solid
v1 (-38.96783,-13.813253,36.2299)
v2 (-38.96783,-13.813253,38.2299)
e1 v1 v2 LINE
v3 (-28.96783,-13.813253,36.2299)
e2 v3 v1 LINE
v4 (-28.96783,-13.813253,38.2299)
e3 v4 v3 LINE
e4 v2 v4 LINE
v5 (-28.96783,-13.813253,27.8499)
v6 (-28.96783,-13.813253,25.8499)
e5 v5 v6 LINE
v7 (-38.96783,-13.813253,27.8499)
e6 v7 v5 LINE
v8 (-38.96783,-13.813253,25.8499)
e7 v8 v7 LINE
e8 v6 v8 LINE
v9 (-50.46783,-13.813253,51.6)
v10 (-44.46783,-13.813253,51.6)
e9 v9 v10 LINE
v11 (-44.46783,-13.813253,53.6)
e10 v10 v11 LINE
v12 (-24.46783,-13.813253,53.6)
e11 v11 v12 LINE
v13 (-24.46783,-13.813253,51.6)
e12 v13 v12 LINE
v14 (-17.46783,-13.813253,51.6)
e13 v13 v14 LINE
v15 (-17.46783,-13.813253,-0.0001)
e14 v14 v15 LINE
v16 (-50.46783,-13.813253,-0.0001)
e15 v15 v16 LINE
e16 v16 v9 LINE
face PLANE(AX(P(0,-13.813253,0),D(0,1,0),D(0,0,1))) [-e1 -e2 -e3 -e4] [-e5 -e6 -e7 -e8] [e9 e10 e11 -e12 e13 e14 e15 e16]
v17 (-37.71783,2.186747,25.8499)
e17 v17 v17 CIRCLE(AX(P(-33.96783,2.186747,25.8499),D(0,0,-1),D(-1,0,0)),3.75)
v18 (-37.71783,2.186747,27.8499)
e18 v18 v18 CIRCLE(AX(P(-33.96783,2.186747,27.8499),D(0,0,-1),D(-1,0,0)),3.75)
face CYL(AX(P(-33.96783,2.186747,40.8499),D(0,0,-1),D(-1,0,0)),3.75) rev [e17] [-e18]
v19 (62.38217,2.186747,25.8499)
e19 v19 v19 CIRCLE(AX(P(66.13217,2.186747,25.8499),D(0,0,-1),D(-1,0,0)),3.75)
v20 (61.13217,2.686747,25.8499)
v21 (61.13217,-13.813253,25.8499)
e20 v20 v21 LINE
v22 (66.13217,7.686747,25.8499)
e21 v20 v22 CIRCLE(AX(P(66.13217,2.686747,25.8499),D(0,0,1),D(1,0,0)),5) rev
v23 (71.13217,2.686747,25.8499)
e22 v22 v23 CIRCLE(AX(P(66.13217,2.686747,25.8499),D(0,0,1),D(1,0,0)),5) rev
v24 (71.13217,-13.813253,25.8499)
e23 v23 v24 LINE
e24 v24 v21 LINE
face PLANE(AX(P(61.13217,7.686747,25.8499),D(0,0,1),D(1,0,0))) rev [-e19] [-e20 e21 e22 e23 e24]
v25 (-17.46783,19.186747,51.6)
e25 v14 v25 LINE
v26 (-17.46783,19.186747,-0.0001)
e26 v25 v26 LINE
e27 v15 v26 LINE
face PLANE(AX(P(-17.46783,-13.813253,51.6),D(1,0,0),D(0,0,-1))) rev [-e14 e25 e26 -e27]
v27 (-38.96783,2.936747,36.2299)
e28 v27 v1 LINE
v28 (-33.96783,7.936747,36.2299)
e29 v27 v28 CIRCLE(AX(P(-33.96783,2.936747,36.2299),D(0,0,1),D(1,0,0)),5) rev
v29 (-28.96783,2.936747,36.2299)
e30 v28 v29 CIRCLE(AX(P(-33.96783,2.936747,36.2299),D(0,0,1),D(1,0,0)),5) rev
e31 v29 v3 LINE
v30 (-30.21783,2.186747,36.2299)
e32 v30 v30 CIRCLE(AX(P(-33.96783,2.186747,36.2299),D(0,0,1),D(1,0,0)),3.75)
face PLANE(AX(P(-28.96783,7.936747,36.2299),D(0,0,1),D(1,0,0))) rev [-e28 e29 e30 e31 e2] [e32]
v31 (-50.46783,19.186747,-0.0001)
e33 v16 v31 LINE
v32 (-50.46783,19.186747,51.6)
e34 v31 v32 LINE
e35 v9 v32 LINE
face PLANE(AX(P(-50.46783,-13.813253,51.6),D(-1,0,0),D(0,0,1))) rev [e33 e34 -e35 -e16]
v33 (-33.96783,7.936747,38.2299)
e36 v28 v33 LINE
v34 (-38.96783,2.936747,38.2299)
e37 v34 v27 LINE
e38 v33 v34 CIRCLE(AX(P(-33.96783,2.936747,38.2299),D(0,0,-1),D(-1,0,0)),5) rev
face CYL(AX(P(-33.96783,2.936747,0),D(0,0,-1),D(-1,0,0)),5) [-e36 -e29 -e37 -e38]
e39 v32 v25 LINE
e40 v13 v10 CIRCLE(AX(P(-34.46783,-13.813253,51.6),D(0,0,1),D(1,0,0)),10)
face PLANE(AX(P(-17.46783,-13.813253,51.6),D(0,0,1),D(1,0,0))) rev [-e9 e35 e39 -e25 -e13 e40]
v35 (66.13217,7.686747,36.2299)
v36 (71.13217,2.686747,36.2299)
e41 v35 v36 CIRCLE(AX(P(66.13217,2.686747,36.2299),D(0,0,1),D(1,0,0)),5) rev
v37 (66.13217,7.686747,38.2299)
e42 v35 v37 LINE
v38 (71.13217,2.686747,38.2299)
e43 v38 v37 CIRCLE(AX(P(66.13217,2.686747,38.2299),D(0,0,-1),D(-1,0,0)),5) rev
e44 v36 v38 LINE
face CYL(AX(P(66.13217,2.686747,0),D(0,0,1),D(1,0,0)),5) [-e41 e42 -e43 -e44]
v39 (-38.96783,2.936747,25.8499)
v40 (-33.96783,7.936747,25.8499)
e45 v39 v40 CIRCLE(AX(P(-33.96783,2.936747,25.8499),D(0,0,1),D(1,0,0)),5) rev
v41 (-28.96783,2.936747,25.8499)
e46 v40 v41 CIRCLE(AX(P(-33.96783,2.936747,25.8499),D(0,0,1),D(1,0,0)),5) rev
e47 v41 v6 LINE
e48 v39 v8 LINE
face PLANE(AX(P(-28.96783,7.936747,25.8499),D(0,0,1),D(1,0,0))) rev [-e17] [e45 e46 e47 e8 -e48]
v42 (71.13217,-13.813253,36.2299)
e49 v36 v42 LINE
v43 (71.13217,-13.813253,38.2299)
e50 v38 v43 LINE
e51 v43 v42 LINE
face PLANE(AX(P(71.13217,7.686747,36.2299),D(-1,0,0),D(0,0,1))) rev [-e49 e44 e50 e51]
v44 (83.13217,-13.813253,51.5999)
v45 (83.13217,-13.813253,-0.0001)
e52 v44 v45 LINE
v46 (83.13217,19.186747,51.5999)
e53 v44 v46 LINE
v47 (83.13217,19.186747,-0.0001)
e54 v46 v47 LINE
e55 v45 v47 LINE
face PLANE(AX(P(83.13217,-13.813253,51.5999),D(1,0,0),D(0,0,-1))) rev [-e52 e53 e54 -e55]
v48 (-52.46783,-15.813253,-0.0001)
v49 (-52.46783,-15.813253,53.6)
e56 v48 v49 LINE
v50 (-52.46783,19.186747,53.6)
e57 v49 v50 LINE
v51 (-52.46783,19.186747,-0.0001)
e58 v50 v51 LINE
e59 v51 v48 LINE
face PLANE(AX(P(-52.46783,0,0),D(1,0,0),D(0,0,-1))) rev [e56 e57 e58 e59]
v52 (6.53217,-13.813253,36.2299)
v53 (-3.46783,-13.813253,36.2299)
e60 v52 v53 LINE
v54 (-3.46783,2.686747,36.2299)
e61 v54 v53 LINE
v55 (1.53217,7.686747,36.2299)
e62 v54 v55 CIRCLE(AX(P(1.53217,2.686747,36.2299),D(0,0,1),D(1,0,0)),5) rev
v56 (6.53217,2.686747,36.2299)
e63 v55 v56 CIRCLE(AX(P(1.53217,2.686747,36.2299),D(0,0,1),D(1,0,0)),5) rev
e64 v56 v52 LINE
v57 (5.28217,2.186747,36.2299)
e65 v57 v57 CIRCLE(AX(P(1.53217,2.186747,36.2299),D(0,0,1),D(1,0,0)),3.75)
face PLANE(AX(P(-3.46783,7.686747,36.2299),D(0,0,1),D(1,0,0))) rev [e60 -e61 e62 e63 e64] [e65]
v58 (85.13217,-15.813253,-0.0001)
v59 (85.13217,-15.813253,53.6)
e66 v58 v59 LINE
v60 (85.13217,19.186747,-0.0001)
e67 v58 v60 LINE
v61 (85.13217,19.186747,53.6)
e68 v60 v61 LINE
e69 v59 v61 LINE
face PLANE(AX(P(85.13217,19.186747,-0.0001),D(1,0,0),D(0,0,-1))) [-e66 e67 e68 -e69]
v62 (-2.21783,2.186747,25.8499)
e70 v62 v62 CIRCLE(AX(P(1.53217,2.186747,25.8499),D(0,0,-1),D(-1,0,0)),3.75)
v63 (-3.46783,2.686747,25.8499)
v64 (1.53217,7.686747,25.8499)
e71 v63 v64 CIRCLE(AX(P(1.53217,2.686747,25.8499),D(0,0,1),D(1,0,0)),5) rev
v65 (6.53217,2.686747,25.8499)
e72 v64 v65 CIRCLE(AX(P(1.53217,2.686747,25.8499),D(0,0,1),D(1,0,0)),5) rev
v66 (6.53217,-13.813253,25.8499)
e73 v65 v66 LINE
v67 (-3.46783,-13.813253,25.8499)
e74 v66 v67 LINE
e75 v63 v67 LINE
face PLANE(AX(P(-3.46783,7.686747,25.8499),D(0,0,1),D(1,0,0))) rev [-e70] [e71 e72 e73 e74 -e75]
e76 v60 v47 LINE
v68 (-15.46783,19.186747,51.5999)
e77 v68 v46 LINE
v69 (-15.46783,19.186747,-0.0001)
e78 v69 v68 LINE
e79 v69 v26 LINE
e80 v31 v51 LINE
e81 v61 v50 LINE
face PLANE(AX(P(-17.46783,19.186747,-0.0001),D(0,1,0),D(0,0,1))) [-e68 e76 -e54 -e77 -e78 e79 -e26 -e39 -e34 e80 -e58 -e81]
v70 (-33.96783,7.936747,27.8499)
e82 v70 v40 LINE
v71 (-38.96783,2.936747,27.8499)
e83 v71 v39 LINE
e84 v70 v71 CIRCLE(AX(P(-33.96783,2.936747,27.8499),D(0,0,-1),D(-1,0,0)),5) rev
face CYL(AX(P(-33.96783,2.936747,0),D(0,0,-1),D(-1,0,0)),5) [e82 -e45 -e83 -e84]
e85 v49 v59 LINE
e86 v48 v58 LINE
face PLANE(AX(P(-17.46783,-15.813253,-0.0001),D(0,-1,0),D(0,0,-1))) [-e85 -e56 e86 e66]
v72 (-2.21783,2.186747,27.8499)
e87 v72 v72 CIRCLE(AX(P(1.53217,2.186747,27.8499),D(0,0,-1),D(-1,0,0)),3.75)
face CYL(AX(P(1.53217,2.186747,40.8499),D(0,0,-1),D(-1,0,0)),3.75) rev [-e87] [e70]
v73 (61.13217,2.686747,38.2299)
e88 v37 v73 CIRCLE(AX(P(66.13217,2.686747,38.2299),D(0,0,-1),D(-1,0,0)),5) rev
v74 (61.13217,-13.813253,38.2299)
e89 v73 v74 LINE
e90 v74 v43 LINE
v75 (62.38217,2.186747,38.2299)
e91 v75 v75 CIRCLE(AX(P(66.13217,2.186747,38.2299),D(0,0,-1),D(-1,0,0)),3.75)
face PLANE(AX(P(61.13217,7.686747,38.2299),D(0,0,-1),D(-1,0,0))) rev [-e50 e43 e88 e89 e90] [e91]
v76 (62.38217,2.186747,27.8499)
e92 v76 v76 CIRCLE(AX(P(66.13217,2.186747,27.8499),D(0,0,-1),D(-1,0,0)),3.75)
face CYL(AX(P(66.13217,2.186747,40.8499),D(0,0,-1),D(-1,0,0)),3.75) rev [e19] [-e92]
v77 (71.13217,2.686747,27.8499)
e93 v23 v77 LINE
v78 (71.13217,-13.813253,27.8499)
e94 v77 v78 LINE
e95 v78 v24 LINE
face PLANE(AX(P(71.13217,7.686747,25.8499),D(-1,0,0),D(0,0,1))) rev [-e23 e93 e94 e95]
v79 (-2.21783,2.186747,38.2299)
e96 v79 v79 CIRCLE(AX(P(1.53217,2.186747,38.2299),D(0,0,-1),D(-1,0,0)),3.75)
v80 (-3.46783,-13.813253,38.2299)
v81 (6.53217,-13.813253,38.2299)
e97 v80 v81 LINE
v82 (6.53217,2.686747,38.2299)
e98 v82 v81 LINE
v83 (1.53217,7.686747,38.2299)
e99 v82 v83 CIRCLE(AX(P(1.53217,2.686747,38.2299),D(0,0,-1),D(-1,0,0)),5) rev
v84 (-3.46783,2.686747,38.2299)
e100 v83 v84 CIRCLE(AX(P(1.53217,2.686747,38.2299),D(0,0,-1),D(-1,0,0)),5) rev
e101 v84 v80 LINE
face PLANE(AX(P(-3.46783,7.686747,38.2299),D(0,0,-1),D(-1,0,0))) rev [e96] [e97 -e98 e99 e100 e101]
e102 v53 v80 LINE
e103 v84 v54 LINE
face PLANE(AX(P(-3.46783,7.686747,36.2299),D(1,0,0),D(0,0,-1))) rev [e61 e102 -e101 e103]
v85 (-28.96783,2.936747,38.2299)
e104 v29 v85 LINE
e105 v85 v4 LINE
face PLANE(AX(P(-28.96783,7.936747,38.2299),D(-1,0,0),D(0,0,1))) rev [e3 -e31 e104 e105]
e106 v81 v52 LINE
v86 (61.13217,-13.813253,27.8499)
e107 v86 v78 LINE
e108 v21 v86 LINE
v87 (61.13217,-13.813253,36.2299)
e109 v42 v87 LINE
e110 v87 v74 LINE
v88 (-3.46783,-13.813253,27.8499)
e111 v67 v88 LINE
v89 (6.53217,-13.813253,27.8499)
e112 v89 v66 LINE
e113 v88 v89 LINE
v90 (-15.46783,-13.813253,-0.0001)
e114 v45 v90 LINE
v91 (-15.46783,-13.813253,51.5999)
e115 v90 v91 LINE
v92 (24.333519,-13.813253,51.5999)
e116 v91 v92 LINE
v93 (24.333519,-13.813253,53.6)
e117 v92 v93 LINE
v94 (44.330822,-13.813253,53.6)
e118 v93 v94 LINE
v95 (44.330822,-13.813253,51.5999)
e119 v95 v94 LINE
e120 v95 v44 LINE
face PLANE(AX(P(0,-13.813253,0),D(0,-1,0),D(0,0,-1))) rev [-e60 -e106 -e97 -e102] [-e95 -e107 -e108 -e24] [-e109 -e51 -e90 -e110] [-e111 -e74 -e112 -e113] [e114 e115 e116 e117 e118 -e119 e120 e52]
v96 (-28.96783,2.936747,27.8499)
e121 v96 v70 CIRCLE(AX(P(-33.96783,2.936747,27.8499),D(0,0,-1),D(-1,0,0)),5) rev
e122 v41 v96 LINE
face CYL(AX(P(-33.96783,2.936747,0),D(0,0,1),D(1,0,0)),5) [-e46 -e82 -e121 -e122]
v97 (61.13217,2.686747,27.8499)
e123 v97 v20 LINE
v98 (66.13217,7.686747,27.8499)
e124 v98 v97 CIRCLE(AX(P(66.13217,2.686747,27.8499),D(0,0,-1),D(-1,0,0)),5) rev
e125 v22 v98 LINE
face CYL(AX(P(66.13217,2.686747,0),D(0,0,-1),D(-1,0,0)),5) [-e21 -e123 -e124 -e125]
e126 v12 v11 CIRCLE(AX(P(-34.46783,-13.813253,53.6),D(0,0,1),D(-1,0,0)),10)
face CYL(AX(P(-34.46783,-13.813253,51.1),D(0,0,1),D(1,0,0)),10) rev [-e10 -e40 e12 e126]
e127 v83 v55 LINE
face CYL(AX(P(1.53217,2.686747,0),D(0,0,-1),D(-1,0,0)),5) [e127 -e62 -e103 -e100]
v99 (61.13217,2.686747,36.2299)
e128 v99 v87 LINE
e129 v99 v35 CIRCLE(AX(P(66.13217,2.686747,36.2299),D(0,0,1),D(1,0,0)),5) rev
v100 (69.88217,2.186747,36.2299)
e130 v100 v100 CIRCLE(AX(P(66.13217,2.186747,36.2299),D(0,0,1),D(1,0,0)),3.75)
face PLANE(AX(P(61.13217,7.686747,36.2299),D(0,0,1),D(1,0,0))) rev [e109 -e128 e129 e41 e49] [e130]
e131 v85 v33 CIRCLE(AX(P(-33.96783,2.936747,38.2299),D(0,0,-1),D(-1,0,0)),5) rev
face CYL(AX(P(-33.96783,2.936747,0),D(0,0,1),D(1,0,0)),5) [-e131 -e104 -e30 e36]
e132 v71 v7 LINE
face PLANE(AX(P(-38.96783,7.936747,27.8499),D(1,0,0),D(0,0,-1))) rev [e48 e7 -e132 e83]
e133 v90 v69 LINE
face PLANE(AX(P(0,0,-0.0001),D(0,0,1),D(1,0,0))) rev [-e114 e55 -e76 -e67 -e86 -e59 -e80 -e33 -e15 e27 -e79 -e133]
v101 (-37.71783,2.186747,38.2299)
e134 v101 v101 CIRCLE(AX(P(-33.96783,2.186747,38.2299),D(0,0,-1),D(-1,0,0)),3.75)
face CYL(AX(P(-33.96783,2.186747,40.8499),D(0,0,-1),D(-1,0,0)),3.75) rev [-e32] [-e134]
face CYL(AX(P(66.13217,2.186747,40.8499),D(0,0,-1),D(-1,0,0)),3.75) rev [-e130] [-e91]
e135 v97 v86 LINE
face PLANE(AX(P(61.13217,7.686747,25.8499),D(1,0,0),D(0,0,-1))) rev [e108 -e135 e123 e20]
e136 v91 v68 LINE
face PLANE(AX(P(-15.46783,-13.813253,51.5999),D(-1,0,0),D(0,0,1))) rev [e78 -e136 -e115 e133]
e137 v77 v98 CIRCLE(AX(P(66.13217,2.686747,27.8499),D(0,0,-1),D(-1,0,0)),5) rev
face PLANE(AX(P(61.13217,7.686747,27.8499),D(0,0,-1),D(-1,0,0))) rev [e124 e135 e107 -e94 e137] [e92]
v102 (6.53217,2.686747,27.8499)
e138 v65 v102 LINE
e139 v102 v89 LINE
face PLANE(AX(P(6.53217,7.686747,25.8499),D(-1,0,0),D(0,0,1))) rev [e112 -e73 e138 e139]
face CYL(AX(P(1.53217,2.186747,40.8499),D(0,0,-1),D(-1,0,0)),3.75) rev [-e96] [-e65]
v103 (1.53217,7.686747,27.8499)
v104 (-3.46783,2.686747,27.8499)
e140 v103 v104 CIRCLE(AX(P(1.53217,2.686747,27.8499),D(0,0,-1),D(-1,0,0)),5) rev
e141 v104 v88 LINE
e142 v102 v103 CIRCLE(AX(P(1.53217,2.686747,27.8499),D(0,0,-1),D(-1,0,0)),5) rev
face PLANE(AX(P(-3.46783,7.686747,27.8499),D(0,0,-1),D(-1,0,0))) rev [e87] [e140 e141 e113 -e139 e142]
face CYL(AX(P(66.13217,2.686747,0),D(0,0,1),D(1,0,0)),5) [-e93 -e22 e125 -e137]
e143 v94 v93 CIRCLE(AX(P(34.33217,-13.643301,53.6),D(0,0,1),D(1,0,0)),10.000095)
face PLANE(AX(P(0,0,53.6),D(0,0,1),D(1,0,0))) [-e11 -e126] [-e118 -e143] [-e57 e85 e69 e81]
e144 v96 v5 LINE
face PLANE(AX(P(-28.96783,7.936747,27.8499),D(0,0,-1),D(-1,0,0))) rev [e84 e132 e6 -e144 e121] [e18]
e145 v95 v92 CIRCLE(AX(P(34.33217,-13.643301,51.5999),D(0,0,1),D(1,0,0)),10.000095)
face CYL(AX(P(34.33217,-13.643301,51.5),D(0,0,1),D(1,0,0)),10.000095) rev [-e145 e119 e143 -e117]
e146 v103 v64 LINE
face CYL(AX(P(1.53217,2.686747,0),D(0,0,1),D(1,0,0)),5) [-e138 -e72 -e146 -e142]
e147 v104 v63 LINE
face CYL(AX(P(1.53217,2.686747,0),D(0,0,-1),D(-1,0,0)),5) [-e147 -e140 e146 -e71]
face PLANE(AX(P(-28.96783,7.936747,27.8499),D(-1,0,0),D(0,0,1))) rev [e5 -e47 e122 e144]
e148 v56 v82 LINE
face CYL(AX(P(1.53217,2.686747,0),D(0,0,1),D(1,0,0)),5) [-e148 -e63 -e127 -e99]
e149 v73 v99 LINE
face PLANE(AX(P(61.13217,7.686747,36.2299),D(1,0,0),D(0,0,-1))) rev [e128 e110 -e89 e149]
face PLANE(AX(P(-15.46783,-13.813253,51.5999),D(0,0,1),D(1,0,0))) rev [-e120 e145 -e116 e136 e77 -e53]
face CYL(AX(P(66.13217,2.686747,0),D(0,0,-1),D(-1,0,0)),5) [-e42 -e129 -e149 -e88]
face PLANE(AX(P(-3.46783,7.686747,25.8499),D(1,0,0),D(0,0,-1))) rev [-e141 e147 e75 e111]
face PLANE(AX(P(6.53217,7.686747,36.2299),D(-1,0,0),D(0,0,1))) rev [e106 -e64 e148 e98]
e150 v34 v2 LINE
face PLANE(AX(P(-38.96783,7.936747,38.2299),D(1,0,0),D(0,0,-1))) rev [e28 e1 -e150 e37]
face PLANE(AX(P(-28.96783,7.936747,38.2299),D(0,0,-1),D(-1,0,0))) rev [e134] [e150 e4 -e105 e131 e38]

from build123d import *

# Parameters (mm, degrees)
BOSS_EXTRU_1_DEPTH      = 53.6
BOSS_EXTRU_1_DEPTH_BACK = 0.0001
ESQUISSE1_W             = 102.6
ESQUISSE1_H             = 35
ESQUISSE4_W             = 98.6
ESQUISSE4_H             = 51.6
ENL_V_MAT_EXTRU_2_DEPTH = 33
ESQUISSE9_W             = 10
ESQUISSE9_H             = 2
BOSS_EXTRU_3_DEPTH      = 21.5
CONG_2_R                = 5
ESQUISSE10_R            = 3.75
ENL_V_MAT_EXTRU_4_DEPTH = 15
ESQUISSE16_W            = 53.6001
ESQUISSE16_H            = 35
BOSS_EXTRU_5_DEPTH      = 35
ENL_V_MAT_EXTRU_5_DEPTH = 2.1
ESQUISSE19_W            = 33
ESQUISSE19_H            = 51.6001
ENL_V_MAT_EXTRU_6_DEPTH = 33
ENL_V_MAT_EXTRU_7_DEPTH = 2.5
ESQUISSE21_W            = 10
ESQUISSE21_H            = 2
BOSS_EXTRU_6_DEPTH      = 21.75
CONG_3_R                = 5
ESQUISSE22_R            = 3.75
ENL_V_MAT_EXTRU_8_DEPTH = 15


with BuildPart() as part:
    # Esquisse1 → Boss.-Extru.1 (new, two sides: drawn at the far end of the back side and taken through both)
    with BuildSketch(Plane.XY.offset(-BOSS_EXTRU_1_DEPTH_BACK)):
        with Locations((33.832170394, 1.686746988)):
            Rectangle(ESQUISSE1_W, ESQUISSE1_H)
    extrude(amount=BOSS_EXTRU_1_DEPTH + BOSS_EXTRU_1_DEPTH_BACK)

    # Esquisse4 → Enlèv. mat.-Extru.2 (cut)
    with BuildSketch(Plane(origin=(0, 19.186746988, 0), x_dir=(1, 0, 0), z_dir=(0, 1, 0))):
        with Locations((33.832170394, -25.7999)):
            Rectangle(ESQUISSE4_W, ESQUISSE4_H)
    extrude(amount=-ENL_V_MAT_EXTRU_2_DEPTH, mode=Mode.SUBTRACT)

    # Esquisse9 → Boss.-Extru.3 (add)
    with BuildSketch(Plane(origin=(0, -13.813253012, 0), x_dir=(1, 0, 0), z_dir=(0, 1, 0))):
        with Locations((1.532170394, -26.8499)):
            Rectangle(ESQUISSE9_W, ESQUISSE9_H)
        with Locations((1.532170394, -37.2299)):
            Rectangle(ESQUISSE9_W, ESQUISSE9_H)
        with Locations((66.132170394, -26.8499)):
            Rectangle(ESQUISSE9_W, ESQUISSE9_H)
        with Locations((66.132170394, -37.2299)):
            Rectangle(ESQUISSE9_W, ESQUISSE9_H)
    extrude(amount=BOSS_EXTRU_3_DEPTH)

    # Congé2
    cong_2_edges = [part.edges().sort_by_distance(p)[0] for p in [
        (71.132170394, 7.686746988, 37.2299),
        (61.132170394, 7.686746988, 37.2299),
        (71.132170394, 7.686746988, 26.8499),
        (61.132170394, 7.686746988, 26.8499),
        (-3.467829606, 7.686746988, 37.2299),
        (6.532170394, 7.686746988, 37.2299),
        (-3.467829606, 7.686746988, 26.8499),
        (6.532170394, 7.686746988, 26.8499),
    ]]
    fillet(cong_2_edges, radius=CONG_2_R - 0.0001)  # a hair under: the kernel refuses the full size

    # Esquisse10 → Enlèv. mat.-Extru.4 (cut)
    with BuildSketch(Plane(origin=(0, 0, 25.8499), x_dir=(-1, 0, 0), z_dir=(0, 0, -1))):
        with Locations((-66.132170394, 2.186746988)):
            Circle(ESQUISSE10_R)
        with Locations((-1.532170394, 2.186746988)):
            Circle(ESQUISSE10_R)
    extrude(amount=-ENL_V_MAT_EXTRU_4_DEPTH, mode=Mode.SUBTRACT)

    # Esquisse16 → Boss.-Extru.5 (add)
    with BuildSketch(Plane.ZY.offset(17.467829606)):
        with Locations((26.79995, 1.686746988)):
            Rectangle(ESQUISSE16_W, ESQUISSE16_H)
    extrude(amount=BOSS_EXTRU_5_DEPTH)

    # Esquisse18 → Enlèv. mat.-Extru.5 (cut)
    with BuildSketch(Plane.XY.offset(53.6)):
        with BuildLine():
            Line((24.333519225, -13.813253012), (44.330821563, -13.813253012))
            ThreePointArc((44.330821563, -13.813253012), (34.332170394, -3.643205178), (24.333519225, -13.813253012))
        make_face()
    extrude(amount=-ENL_V_MAT_EXTRU_5_DEPTH, mode=Mode.SUBTRACT)

    # Esquisse19 → Enlèv. mat.-Extru.6 (cut)
    with BuildSketch(Plane(origin=(0, 19.186746988, 0), x_dir=(1, 0, 0), z_dir=(0, 1, 0))):
        with Locations((-33.967829606, -25.79995)):
            Rectangle(ESQUISSE19_W, ESQUISSE19_H)
    extrude(amount=-ENL_V_MAT_EXTRU_6_DEPTH, mode=Mode.SUBTRACT)

    # Esquisse20 → Enlèv. mat.-Extru.7 (cut)
    with BuildSketch(Plane.XY.offset(53.6)):
        with BuildLine():
            Line((-24.467829606, -13.813253012), (-44.467829606, -13.813253012))
            ThreePointArc((-44.467829606, -13.813253012), (-34.467829606, -3.813253012), (-24.467829606, -13.813253012))
        make_face()
    extrude(amount=-ENL_V_MAT_EXTRU_7_DEPTH, mode=Mode.SUBTRACT)

    # Esquisse21 → Boss.-Extru.6 (add)
    with BuildSketch(Plane(origin=(0, -13.813253012, 0), x_dir=(1, 0, 0), z_dir=(0, 1, 0))):
        with Locations((-33.967829606, -26.8499)):
            Rectangle(ESQUISSE21_W, ESQUISSE21_H)
        with Locations((-33.967829606, -37.2299)):
            Rectangle(ESQUISSE21_W, ESQUISSE21_H)
    extrude(amount=BOSS_EXTRU_6_DEPTH)

    # Congé3
    cong_3_edges = [part.edges().sort_by_distance(p)[0] for p in [
        (-28.967829606, 7.936746988, 37.2299),
        (-38.967829606, 7.936746988, 37.2299),
        (-38.967829606, 7.936746988, 26.8499),
        (-28.967829606, 7.936746988, 26.8499),
    ]]
    fillet(cong_3_edges, radius=CONG_3_R - 0.0001)  # a hair under: the kernel refuses the full size

    # Esquisse22 → Enlèv. mat.-Extru.8 (cut)
    with BuildSketch(Plane(origin=(0, 0, 25.8499), x_dir=(-1, 0, 0), z_dir=(0, 0, -1))):
        with Locations((33.967829606, 2.186746988)):
            Circle(ESQUISSE22_R)
    extrude(amount=-ENL_V_MAT_EXTRU_8_DEPTH, mode=Mode.SUBTRACT)


solid = part.part
